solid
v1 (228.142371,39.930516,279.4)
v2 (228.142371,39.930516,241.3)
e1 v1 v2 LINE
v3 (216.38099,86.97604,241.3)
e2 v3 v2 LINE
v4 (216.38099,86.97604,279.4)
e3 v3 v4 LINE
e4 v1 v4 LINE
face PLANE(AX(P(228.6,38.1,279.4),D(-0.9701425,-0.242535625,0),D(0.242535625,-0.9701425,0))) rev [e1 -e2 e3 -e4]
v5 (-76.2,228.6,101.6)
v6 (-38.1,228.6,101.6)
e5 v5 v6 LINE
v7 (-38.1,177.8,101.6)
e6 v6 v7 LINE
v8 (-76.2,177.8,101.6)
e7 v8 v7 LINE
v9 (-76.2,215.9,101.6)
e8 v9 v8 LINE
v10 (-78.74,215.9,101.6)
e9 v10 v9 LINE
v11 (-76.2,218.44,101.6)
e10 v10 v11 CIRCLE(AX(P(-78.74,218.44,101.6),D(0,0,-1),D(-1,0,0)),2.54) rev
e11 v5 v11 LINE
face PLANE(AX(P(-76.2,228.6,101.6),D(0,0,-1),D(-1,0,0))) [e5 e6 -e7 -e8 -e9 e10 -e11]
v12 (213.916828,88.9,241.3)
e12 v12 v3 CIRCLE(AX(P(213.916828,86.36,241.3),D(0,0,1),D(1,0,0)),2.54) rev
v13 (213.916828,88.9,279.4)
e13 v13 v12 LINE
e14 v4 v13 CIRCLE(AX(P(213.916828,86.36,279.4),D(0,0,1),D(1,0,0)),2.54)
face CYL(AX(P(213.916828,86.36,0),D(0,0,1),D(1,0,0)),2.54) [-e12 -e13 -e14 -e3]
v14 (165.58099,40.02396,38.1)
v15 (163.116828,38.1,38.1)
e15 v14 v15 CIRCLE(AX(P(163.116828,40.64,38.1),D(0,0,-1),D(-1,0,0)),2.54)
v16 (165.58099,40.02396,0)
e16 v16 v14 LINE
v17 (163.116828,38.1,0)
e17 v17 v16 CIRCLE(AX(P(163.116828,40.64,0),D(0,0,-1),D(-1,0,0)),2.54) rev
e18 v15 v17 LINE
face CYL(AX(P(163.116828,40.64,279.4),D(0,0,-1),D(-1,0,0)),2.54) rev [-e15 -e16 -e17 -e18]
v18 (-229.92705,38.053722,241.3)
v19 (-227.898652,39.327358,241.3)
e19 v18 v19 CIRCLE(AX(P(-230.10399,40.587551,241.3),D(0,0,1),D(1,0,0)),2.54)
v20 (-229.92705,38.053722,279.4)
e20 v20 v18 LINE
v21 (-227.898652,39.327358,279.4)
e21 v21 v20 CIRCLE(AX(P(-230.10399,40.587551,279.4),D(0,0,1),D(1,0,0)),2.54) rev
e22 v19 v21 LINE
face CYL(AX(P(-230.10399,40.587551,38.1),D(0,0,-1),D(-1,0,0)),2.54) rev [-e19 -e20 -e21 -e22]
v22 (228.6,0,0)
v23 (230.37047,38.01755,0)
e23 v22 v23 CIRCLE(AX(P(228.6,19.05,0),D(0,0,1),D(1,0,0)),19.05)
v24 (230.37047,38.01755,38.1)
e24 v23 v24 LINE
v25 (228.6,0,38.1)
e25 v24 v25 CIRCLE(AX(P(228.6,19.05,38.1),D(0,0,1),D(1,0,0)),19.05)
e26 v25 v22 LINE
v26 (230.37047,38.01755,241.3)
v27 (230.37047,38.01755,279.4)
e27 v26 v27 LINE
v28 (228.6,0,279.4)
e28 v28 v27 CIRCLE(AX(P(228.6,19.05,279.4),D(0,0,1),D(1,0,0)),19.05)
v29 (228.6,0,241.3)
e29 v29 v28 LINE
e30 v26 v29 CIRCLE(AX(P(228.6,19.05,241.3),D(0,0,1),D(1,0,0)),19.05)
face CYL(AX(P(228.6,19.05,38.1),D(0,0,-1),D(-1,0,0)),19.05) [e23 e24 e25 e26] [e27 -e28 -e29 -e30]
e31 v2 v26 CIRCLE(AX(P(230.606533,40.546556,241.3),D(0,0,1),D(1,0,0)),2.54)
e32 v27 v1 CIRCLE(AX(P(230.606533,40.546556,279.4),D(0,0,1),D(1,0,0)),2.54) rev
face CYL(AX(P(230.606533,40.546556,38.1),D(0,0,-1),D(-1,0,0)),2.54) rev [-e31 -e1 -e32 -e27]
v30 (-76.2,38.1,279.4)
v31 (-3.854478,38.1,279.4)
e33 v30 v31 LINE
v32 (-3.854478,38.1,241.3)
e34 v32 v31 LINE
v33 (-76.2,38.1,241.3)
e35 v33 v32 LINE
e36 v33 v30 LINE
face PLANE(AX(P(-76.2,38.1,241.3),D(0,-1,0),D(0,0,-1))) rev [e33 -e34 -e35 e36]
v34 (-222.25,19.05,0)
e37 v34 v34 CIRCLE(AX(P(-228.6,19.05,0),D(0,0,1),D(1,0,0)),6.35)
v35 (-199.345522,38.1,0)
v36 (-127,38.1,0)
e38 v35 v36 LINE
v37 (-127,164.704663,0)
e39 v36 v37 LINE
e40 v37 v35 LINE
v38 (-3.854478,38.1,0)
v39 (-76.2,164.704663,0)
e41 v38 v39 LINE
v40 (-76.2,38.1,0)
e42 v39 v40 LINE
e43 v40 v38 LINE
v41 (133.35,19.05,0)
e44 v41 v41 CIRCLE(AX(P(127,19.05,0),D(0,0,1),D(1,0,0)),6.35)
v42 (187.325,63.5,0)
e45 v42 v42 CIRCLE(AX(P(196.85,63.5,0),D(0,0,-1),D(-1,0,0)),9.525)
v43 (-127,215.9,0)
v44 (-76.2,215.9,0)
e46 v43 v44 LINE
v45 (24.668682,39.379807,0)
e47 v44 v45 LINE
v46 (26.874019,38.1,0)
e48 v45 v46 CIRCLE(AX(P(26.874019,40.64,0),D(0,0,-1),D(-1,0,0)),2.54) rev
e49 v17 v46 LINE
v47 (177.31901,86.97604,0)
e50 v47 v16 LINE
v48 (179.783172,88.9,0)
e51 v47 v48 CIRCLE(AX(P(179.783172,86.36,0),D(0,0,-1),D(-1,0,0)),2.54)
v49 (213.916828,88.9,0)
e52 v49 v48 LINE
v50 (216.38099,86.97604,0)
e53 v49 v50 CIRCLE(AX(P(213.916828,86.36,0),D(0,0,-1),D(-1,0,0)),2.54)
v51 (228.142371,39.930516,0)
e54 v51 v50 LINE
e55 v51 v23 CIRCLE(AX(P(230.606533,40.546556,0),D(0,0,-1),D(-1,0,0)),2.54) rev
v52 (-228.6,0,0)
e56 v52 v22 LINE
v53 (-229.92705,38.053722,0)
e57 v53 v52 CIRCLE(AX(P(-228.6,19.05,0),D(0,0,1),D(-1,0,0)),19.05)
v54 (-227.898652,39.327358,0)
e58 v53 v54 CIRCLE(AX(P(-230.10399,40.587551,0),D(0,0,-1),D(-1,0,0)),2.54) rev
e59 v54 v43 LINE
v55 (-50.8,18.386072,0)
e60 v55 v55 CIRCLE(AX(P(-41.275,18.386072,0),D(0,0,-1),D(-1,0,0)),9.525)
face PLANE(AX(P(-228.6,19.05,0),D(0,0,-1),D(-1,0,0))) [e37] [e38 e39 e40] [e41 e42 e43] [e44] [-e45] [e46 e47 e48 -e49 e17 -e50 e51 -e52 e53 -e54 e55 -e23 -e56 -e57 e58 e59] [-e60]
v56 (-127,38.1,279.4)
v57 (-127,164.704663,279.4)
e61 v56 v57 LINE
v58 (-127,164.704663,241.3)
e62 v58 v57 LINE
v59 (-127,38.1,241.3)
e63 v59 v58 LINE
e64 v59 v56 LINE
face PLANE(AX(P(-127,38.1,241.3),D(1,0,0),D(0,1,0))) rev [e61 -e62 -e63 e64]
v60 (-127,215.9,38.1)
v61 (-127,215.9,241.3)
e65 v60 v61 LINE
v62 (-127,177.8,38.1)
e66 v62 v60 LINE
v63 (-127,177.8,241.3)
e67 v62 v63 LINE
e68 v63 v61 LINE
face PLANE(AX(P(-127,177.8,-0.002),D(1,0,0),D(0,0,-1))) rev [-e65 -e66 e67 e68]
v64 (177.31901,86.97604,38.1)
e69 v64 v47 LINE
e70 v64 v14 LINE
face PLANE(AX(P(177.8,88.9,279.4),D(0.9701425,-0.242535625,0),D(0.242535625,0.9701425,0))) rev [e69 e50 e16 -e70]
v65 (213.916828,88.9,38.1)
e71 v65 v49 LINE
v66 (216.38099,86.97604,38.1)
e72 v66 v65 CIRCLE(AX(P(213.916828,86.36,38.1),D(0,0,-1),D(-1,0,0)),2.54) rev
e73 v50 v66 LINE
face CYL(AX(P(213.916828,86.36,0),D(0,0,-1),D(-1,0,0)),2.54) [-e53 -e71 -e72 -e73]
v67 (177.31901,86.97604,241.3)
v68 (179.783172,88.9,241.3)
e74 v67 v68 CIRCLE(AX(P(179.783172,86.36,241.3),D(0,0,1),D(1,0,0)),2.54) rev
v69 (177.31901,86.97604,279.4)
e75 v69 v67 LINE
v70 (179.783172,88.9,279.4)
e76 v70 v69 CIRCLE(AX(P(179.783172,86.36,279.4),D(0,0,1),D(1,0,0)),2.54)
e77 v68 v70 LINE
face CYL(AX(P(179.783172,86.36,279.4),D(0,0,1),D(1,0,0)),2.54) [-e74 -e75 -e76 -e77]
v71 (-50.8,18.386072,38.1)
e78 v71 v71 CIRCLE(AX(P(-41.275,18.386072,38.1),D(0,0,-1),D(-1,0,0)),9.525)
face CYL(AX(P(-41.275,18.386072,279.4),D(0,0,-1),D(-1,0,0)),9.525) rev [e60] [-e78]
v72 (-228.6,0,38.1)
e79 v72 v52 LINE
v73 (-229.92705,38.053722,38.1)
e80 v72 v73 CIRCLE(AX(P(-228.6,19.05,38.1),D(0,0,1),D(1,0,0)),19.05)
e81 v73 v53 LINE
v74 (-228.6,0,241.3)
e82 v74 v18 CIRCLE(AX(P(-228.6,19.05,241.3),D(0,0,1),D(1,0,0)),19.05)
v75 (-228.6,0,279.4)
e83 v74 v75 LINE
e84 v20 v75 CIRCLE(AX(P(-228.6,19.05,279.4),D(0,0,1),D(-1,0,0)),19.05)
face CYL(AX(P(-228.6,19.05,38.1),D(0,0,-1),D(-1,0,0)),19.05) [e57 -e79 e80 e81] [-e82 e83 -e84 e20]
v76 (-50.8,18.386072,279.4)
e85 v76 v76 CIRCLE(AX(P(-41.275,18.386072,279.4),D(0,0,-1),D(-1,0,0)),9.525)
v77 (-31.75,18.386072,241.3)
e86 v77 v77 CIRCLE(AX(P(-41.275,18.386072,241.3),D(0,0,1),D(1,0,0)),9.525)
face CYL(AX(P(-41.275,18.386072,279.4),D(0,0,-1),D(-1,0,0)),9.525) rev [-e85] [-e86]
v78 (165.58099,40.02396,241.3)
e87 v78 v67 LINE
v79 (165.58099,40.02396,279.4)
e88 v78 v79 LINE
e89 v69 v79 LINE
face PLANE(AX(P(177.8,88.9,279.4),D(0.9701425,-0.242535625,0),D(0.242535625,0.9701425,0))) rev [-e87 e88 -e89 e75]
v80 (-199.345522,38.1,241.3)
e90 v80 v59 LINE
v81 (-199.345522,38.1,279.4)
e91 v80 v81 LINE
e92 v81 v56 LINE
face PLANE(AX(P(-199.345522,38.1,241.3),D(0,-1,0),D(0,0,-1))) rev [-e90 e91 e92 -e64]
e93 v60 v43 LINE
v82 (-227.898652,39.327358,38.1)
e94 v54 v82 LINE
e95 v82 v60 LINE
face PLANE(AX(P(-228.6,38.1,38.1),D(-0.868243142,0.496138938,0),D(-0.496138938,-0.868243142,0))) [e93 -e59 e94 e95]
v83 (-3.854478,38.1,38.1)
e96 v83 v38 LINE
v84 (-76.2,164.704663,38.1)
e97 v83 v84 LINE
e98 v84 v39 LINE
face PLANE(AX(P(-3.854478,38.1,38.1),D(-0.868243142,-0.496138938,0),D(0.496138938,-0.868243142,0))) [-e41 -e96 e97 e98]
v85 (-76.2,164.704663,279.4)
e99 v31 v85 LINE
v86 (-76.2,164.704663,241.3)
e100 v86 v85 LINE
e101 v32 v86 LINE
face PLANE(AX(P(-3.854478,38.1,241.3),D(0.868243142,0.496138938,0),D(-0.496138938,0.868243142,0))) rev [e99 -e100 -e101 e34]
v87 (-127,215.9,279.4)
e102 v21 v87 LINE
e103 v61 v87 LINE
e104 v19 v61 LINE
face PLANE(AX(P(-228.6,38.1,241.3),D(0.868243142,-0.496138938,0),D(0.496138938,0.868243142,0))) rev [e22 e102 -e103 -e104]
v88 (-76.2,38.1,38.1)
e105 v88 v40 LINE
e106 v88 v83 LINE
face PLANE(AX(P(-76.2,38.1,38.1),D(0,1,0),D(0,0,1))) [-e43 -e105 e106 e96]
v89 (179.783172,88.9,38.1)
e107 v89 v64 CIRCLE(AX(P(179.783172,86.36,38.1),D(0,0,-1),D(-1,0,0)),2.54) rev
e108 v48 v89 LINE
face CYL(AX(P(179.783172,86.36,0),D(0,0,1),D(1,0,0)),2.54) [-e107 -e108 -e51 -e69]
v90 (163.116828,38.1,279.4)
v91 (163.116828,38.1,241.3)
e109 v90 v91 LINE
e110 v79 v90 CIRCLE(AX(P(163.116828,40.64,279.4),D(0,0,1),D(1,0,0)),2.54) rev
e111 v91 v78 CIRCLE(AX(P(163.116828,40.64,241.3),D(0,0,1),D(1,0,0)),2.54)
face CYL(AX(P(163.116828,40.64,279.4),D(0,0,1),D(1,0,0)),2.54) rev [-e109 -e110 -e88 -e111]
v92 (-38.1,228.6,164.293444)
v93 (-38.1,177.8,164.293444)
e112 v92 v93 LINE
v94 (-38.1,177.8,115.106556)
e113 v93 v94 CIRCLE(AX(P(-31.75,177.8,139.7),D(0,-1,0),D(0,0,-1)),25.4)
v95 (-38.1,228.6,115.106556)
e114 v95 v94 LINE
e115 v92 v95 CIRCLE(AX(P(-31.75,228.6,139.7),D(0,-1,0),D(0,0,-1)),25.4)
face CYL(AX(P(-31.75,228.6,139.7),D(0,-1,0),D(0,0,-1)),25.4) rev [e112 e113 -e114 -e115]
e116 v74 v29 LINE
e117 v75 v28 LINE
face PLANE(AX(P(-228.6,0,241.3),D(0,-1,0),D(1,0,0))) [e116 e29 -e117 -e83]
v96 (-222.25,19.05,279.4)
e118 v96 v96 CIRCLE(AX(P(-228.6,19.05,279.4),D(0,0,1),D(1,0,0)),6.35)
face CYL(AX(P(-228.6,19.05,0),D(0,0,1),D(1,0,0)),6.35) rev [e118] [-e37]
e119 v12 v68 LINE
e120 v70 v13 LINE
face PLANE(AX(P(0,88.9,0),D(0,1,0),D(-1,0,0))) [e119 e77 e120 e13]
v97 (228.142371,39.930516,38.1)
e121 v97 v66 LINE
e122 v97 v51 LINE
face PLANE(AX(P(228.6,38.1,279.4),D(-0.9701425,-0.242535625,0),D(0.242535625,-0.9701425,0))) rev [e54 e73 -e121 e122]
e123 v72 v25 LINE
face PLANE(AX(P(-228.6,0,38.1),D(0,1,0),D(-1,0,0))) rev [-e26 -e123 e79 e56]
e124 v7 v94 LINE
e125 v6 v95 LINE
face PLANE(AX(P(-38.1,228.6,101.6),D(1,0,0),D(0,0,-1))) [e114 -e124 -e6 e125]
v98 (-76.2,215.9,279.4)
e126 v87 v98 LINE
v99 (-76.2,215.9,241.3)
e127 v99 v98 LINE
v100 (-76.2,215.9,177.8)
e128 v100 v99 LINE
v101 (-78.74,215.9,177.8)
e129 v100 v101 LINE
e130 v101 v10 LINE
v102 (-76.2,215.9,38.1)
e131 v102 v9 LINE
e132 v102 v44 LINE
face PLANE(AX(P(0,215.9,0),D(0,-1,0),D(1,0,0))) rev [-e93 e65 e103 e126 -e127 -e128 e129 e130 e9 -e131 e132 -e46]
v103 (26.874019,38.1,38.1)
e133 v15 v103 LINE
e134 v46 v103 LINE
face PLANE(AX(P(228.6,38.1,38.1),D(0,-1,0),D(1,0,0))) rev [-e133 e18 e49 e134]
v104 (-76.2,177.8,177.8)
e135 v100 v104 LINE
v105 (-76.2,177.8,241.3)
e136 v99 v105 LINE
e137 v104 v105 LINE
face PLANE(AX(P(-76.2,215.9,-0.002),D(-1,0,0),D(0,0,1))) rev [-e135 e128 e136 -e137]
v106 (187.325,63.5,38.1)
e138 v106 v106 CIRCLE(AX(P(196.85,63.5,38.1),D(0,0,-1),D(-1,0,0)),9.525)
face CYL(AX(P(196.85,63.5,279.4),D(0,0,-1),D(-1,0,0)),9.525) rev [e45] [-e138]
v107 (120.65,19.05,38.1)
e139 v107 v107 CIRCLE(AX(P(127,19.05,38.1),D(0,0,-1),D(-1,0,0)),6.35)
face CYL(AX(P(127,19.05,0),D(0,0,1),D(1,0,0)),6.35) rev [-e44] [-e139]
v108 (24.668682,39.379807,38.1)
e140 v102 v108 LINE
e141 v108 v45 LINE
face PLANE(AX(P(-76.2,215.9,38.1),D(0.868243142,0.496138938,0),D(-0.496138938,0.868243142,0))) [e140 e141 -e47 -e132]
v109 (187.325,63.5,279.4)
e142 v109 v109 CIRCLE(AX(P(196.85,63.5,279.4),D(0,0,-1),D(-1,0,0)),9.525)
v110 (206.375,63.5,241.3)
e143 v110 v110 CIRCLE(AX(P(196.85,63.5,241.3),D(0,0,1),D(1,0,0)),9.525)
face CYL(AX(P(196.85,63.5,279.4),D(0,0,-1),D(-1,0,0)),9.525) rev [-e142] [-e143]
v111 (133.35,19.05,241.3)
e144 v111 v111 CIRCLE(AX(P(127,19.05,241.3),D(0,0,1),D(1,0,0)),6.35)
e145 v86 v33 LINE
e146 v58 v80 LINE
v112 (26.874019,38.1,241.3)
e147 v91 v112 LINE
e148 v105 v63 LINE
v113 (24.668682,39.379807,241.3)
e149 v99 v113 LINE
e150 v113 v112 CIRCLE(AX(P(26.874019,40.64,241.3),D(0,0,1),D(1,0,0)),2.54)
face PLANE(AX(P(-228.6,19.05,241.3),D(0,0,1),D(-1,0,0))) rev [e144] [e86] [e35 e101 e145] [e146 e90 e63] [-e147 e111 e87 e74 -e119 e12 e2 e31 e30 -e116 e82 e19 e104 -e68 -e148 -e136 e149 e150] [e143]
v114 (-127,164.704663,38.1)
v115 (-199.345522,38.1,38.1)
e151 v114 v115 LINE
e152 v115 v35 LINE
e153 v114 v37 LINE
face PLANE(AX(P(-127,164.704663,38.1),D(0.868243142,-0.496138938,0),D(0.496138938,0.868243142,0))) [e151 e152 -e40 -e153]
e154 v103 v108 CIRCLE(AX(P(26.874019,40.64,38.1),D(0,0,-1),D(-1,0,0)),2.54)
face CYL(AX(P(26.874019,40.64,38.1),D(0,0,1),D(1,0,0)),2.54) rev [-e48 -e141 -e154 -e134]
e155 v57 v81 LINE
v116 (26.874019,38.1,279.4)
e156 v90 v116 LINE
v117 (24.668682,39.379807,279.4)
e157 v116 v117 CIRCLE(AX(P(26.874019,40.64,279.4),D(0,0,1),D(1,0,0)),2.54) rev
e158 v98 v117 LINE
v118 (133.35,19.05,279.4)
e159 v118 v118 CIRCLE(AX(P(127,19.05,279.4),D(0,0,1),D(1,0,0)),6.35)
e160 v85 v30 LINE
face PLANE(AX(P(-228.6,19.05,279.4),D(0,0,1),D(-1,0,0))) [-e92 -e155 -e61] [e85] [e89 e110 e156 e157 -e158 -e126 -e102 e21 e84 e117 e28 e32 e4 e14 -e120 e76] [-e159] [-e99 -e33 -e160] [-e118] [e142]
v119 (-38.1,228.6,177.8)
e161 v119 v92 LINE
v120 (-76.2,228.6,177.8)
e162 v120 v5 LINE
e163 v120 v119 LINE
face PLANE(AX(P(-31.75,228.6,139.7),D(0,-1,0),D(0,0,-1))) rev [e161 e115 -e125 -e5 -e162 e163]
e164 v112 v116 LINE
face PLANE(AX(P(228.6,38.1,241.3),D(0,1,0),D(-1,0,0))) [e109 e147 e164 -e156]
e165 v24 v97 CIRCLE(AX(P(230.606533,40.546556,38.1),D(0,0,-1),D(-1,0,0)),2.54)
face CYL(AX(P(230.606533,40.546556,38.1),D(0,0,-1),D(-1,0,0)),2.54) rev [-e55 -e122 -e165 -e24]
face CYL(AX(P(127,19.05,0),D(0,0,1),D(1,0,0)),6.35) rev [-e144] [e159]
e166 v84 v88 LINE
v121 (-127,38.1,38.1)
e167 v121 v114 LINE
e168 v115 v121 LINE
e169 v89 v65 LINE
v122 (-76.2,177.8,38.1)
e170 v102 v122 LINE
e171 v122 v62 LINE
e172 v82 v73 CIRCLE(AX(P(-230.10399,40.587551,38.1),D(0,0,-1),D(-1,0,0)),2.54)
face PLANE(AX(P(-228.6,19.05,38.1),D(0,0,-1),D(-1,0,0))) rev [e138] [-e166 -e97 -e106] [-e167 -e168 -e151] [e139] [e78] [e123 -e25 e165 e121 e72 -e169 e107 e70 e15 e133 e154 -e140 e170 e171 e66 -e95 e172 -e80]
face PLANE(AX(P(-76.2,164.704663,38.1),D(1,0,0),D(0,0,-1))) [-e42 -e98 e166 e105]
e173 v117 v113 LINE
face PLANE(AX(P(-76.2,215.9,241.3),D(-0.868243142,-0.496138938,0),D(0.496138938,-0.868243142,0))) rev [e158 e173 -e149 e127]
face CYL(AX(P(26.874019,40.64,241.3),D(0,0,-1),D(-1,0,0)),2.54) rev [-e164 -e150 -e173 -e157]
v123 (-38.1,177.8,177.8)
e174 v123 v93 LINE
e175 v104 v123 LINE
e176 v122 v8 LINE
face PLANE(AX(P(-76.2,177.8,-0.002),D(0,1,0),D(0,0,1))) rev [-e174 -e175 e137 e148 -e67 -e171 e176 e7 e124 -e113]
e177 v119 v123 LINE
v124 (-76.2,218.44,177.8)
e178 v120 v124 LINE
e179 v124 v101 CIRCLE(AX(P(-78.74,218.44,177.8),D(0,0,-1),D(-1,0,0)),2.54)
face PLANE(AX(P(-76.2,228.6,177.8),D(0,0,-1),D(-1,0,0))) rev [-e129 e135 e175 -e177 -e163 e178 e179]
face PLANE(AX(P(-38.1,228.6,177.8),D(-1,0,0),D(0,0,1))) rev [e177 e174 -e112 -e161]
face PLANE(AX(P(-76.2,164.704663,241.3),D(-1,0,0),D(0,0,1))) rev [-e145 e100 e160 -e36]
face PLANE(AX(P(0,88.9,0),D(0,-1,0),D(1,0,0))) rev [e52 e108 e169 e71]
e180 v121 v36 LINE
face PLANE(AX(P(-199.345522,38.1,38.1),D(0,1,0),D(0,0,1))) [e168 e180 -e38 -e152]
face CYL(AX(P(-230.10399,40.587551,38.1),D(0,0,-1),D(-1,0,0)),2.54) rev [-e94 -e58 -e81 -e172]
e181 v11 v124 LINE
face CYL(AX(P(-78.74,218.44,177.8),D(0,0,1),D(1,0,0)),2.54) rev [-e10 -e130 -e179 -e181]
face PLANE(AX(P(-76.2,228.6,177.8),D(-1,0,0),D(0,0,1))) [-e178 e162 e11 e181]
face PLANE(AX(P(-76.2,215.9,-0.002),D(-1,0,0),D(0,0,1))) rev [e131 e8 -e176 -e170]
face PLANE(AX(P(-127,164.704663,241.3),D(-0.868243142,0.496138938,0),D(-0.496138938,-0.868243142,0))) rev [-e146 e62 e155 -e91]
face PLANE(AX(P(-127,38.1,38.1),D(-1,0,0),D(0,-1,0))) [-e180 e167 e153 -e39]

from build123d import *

# Parameters (mm, degrees)
BOSS_EXTRUDE1_DEPTH = 38.1
SKETCH2_R           = 19.05
BOSS_EXTRUDE2_DEPTH = 203.2
SKETCH4_W           = 254
SKETCH4_H           = 38.1
BOSS_EXTRUDE3_DEPTH = 177.8
CUT_EXTRUDE3_DEPTH  = 38.1
SKETCH8_R           = 6.35
CUT_EXTRUDE4_DEPTH  = 432.286091243
BOSS_EXTRUDE4_REACH = 409.638
SKETCH9_W           = 50.8
SKETCH9_H           = 38.1
BOSS_EXTRUDE5_DEPTH = 50.8
SKETCH13_W          = 63.5
SKETCH13_H          = 38.1
BOSS_EXTRUDE6_DEPTH = 50.8
CUT_EXTRUDE7_DEPTH  = 438.78172929
FILLET1_R           = 2.54
SKETCH12_R          = 9.525
CUT_EXTRUDE5_DEPTH  = 438.78172929


with BuildPart() as part:
    # Sketch1 → Boss-Extrude1 (new body)
    with BuildSketch(Plane.XY):
        with BuildLine():
            Line((228.6, 38.1), (-228.6, 38.1))
            ThreePointArc((-228.6, 38.1), (-247.65, 19.05), (-228.6, 0))
            Line((-228.6, 0), (228.6, 0))
            ThreePointArc((228.6, 0), (247.65, 19.05), (228.6, 38.1))
        make_face()
    boss_extrude1 = extrude(amount=BOSS_EXTRUDE1_DEPTH)

    # Sketch2 → Boss-Extrude2 (add)
    with BuildSketch(Plane.XY.offset(38.1)):
        with Locations((-228.6, 19.05)):
            Circle(SKETCH2_R)
        with Locations((228.6, 19.05)):
            Circle(SKETCH2_R)
    boss_extrude2 = extrude(amount=BOSS_EXTRUDE2_DEPTH)

    # Mirror3: Boss-Extrude1, Boss-Extrude2 across plane
    add(boss_extrude1.mirror(Plane.XY.offset(139.7)))
    add(boss_extrude2.mirror(Plane.XY.offset(139.7)))

    # Sketch4 → Boss-Extrude3 (add)
    with BuildSketch(Plane(origin=(0, 38.1, 0), x_dir=(1, 0, 0), z_dir=(0, 1, 0))):
        with Locations((-101.6, -260.35)):
            Rectangle(SKETCH4_W, SKETCH4_H)
    boss_extrude3 = extrude(amount=BOSS_EXTRUDE3_DEPTH)

    # Sketch7 → Cut-Extrude3 (cut)
    with BuildSketch(Plane.XY.offset(279.4)):
        Polygon((-228.6, 38.1), (-127, 215.9), (-228.6, 215.9), align=None)
        Polygon((-76.2, 215.9), (25.4, 38.1), (25.4, 215.9), align=None)
        Polygon((-127, 164.704663298), (-199.345521885, 38.1), (-127, 38.1), align=None)
        Polygon((-76.2, 164.704663298), (-76.2, 38.1), (-3.854478115, 38.1), align=None)
    cut_extrude3 = extrude(amount=-CUT_EXTRUDE3_DEPTH, mode=Mode.SUBTRACT)

    # Mirror4: Boss-Extrude3, Cut-Extrude3 across plane
    add(boss_extrude3.mirror(Plane.XY.offset(139.7)))
    add(cut_extrude3.mirror(Plane.XY.offset(139.7)), mode=Mode.SUBTRACT)

    # Sketch8 → Cut-Extrude4 (cut, through all)
    with BuildSketch(Plane.XY.offset(279.4)):
        with Locations((-228.6, 19.05)):
            Circle(SKETCH8_R)
        with Locations((127, 19.05)):
            Circle(SKETCH8_R)
    extrude(amount=-CUT_EXTRUDE4_DEPTH, mode=Mode.SUBTRACT)

    # Sketch9 → Boss-Extrude4 (add, up to next)
    with BuildSketch(Plane(origin=(0, 0, 241.3), x_dir=(-1, 0, 0), z_dir=(0, 0, -1)), mode=Mode.PRIVATE) as boss_extrude4_sk1:
        with Locations((101.6, 196.85)):
            Rectangle(SKETCH9_W, SKETCH9_H)
    boss_extrude4_tool1 = extrude(boss_extrude4_sk1.sketch, amount=BOSS_EXTRUDE4_REACH, mode=Mode.PRIVATE) - part.part
    add(boss_extrude4_tool1.solids().sort_by_distance((-101.6, 196.85, 241.3))[0])

    # Sketch10 → Boss-Extrude5 (add)
    with BuildSketch(Plane.XZ.offset(-177.8)):
        with BuildLine():
            Line((-76.2, 177.8), (-38.1, 177.8))
            Line((-38.1, 177.8), (-38.1, 164.293444248))
            ThreePointArc((-38.1, 164.293444248), (-57.15, 139.7), (-38.1, 115.106555752))
            Line((-38.1, 115.106555752), (-38.1, 101.6))
            Line((-38.1, 101.6), (-76.2, 101.6))
            Line((-76.2, 101.6), (-76.2, 177.8))
        make_face()
    extrude(amount=-BOSS_EXTRUDE5_DEPTH)

    # Sketch13 → Boss-Extrude6 (add)
    with BuildSketch(Plane(origin=(0, 38.1, 0), x_dir=(1, 0, 0), z_dir=(0, 1, 0))):
        with Locations((196.85, -260.35)):
            Rectangle(SKETCH13_W, SKETCH13_H)
        with Locations((196.85, -19.05)):
            Rectangle(SKETCH13_W, SKETCH13_H)
    extrude(amount=BOSS_EXTRUDE6_DEPTH)

    # Sketch14 → Cut-Extrude7 (cut, through all)
    with BuildSketch(Plane(origin=(0, 0, 0), x_dir=(-1, 0, 0), z_dir=(0, 0, -1))):
        Polygon((-177.8, 88.9), (-165.1, 38.1), (-165.1, 88.9), align=None)
        Polygon((-228.6, 38.1), (-215.9, 88.9), (-228.6, 88.9), align=None)
    extrude(amount=-CUT_EXTRUDE7_DEPTH, mode=Mode.SUBTRACT)

    # Fillet1
    fillet1_edges = [part.edges().sort_by_distance(p)[0] for p in [
        (-76.2, 215.9, 139.7),
        (25.4, 38.1, 260.35),
        (25.4, 38.1, 19.05),
        (-228.6, 38.1, 260.35),
        (-228.6, 38.1, 19.05),
        (215.9, 88.9, 260.35),
        (177.8, 88.9, 260.35),
        (165.1, 38.1, 19.05),
        (165.1, 38.1, 260.35),
        (177.8, 88.9, 19.05),
        (215.9, 88.9, 19.05),
        (228.6, 38.1, 19.05),
        (228.6, 38.1, 260.35),
    ]]
    fillet(fillet1_edges, radius=FILLET1_R)

    # Sketch12 → Cut-Extrude5 (cut, through all)
    with BuildSketch(Plane(origin=(0, 0, 0), x_dir=(-1, 0, 0), z_dir=(0, 0, -1))):
        with Locations((41.275, 18.386071678)):
            Circle(SKETCH12_R)
        with Locations((-196.85, 63.5)):
            Circle(SKETCH12_R)
    extrude(amount=-CUT_EXTRUDE5_DEPTH, mode=Mode.SUBTRACT)


solid = part.part
